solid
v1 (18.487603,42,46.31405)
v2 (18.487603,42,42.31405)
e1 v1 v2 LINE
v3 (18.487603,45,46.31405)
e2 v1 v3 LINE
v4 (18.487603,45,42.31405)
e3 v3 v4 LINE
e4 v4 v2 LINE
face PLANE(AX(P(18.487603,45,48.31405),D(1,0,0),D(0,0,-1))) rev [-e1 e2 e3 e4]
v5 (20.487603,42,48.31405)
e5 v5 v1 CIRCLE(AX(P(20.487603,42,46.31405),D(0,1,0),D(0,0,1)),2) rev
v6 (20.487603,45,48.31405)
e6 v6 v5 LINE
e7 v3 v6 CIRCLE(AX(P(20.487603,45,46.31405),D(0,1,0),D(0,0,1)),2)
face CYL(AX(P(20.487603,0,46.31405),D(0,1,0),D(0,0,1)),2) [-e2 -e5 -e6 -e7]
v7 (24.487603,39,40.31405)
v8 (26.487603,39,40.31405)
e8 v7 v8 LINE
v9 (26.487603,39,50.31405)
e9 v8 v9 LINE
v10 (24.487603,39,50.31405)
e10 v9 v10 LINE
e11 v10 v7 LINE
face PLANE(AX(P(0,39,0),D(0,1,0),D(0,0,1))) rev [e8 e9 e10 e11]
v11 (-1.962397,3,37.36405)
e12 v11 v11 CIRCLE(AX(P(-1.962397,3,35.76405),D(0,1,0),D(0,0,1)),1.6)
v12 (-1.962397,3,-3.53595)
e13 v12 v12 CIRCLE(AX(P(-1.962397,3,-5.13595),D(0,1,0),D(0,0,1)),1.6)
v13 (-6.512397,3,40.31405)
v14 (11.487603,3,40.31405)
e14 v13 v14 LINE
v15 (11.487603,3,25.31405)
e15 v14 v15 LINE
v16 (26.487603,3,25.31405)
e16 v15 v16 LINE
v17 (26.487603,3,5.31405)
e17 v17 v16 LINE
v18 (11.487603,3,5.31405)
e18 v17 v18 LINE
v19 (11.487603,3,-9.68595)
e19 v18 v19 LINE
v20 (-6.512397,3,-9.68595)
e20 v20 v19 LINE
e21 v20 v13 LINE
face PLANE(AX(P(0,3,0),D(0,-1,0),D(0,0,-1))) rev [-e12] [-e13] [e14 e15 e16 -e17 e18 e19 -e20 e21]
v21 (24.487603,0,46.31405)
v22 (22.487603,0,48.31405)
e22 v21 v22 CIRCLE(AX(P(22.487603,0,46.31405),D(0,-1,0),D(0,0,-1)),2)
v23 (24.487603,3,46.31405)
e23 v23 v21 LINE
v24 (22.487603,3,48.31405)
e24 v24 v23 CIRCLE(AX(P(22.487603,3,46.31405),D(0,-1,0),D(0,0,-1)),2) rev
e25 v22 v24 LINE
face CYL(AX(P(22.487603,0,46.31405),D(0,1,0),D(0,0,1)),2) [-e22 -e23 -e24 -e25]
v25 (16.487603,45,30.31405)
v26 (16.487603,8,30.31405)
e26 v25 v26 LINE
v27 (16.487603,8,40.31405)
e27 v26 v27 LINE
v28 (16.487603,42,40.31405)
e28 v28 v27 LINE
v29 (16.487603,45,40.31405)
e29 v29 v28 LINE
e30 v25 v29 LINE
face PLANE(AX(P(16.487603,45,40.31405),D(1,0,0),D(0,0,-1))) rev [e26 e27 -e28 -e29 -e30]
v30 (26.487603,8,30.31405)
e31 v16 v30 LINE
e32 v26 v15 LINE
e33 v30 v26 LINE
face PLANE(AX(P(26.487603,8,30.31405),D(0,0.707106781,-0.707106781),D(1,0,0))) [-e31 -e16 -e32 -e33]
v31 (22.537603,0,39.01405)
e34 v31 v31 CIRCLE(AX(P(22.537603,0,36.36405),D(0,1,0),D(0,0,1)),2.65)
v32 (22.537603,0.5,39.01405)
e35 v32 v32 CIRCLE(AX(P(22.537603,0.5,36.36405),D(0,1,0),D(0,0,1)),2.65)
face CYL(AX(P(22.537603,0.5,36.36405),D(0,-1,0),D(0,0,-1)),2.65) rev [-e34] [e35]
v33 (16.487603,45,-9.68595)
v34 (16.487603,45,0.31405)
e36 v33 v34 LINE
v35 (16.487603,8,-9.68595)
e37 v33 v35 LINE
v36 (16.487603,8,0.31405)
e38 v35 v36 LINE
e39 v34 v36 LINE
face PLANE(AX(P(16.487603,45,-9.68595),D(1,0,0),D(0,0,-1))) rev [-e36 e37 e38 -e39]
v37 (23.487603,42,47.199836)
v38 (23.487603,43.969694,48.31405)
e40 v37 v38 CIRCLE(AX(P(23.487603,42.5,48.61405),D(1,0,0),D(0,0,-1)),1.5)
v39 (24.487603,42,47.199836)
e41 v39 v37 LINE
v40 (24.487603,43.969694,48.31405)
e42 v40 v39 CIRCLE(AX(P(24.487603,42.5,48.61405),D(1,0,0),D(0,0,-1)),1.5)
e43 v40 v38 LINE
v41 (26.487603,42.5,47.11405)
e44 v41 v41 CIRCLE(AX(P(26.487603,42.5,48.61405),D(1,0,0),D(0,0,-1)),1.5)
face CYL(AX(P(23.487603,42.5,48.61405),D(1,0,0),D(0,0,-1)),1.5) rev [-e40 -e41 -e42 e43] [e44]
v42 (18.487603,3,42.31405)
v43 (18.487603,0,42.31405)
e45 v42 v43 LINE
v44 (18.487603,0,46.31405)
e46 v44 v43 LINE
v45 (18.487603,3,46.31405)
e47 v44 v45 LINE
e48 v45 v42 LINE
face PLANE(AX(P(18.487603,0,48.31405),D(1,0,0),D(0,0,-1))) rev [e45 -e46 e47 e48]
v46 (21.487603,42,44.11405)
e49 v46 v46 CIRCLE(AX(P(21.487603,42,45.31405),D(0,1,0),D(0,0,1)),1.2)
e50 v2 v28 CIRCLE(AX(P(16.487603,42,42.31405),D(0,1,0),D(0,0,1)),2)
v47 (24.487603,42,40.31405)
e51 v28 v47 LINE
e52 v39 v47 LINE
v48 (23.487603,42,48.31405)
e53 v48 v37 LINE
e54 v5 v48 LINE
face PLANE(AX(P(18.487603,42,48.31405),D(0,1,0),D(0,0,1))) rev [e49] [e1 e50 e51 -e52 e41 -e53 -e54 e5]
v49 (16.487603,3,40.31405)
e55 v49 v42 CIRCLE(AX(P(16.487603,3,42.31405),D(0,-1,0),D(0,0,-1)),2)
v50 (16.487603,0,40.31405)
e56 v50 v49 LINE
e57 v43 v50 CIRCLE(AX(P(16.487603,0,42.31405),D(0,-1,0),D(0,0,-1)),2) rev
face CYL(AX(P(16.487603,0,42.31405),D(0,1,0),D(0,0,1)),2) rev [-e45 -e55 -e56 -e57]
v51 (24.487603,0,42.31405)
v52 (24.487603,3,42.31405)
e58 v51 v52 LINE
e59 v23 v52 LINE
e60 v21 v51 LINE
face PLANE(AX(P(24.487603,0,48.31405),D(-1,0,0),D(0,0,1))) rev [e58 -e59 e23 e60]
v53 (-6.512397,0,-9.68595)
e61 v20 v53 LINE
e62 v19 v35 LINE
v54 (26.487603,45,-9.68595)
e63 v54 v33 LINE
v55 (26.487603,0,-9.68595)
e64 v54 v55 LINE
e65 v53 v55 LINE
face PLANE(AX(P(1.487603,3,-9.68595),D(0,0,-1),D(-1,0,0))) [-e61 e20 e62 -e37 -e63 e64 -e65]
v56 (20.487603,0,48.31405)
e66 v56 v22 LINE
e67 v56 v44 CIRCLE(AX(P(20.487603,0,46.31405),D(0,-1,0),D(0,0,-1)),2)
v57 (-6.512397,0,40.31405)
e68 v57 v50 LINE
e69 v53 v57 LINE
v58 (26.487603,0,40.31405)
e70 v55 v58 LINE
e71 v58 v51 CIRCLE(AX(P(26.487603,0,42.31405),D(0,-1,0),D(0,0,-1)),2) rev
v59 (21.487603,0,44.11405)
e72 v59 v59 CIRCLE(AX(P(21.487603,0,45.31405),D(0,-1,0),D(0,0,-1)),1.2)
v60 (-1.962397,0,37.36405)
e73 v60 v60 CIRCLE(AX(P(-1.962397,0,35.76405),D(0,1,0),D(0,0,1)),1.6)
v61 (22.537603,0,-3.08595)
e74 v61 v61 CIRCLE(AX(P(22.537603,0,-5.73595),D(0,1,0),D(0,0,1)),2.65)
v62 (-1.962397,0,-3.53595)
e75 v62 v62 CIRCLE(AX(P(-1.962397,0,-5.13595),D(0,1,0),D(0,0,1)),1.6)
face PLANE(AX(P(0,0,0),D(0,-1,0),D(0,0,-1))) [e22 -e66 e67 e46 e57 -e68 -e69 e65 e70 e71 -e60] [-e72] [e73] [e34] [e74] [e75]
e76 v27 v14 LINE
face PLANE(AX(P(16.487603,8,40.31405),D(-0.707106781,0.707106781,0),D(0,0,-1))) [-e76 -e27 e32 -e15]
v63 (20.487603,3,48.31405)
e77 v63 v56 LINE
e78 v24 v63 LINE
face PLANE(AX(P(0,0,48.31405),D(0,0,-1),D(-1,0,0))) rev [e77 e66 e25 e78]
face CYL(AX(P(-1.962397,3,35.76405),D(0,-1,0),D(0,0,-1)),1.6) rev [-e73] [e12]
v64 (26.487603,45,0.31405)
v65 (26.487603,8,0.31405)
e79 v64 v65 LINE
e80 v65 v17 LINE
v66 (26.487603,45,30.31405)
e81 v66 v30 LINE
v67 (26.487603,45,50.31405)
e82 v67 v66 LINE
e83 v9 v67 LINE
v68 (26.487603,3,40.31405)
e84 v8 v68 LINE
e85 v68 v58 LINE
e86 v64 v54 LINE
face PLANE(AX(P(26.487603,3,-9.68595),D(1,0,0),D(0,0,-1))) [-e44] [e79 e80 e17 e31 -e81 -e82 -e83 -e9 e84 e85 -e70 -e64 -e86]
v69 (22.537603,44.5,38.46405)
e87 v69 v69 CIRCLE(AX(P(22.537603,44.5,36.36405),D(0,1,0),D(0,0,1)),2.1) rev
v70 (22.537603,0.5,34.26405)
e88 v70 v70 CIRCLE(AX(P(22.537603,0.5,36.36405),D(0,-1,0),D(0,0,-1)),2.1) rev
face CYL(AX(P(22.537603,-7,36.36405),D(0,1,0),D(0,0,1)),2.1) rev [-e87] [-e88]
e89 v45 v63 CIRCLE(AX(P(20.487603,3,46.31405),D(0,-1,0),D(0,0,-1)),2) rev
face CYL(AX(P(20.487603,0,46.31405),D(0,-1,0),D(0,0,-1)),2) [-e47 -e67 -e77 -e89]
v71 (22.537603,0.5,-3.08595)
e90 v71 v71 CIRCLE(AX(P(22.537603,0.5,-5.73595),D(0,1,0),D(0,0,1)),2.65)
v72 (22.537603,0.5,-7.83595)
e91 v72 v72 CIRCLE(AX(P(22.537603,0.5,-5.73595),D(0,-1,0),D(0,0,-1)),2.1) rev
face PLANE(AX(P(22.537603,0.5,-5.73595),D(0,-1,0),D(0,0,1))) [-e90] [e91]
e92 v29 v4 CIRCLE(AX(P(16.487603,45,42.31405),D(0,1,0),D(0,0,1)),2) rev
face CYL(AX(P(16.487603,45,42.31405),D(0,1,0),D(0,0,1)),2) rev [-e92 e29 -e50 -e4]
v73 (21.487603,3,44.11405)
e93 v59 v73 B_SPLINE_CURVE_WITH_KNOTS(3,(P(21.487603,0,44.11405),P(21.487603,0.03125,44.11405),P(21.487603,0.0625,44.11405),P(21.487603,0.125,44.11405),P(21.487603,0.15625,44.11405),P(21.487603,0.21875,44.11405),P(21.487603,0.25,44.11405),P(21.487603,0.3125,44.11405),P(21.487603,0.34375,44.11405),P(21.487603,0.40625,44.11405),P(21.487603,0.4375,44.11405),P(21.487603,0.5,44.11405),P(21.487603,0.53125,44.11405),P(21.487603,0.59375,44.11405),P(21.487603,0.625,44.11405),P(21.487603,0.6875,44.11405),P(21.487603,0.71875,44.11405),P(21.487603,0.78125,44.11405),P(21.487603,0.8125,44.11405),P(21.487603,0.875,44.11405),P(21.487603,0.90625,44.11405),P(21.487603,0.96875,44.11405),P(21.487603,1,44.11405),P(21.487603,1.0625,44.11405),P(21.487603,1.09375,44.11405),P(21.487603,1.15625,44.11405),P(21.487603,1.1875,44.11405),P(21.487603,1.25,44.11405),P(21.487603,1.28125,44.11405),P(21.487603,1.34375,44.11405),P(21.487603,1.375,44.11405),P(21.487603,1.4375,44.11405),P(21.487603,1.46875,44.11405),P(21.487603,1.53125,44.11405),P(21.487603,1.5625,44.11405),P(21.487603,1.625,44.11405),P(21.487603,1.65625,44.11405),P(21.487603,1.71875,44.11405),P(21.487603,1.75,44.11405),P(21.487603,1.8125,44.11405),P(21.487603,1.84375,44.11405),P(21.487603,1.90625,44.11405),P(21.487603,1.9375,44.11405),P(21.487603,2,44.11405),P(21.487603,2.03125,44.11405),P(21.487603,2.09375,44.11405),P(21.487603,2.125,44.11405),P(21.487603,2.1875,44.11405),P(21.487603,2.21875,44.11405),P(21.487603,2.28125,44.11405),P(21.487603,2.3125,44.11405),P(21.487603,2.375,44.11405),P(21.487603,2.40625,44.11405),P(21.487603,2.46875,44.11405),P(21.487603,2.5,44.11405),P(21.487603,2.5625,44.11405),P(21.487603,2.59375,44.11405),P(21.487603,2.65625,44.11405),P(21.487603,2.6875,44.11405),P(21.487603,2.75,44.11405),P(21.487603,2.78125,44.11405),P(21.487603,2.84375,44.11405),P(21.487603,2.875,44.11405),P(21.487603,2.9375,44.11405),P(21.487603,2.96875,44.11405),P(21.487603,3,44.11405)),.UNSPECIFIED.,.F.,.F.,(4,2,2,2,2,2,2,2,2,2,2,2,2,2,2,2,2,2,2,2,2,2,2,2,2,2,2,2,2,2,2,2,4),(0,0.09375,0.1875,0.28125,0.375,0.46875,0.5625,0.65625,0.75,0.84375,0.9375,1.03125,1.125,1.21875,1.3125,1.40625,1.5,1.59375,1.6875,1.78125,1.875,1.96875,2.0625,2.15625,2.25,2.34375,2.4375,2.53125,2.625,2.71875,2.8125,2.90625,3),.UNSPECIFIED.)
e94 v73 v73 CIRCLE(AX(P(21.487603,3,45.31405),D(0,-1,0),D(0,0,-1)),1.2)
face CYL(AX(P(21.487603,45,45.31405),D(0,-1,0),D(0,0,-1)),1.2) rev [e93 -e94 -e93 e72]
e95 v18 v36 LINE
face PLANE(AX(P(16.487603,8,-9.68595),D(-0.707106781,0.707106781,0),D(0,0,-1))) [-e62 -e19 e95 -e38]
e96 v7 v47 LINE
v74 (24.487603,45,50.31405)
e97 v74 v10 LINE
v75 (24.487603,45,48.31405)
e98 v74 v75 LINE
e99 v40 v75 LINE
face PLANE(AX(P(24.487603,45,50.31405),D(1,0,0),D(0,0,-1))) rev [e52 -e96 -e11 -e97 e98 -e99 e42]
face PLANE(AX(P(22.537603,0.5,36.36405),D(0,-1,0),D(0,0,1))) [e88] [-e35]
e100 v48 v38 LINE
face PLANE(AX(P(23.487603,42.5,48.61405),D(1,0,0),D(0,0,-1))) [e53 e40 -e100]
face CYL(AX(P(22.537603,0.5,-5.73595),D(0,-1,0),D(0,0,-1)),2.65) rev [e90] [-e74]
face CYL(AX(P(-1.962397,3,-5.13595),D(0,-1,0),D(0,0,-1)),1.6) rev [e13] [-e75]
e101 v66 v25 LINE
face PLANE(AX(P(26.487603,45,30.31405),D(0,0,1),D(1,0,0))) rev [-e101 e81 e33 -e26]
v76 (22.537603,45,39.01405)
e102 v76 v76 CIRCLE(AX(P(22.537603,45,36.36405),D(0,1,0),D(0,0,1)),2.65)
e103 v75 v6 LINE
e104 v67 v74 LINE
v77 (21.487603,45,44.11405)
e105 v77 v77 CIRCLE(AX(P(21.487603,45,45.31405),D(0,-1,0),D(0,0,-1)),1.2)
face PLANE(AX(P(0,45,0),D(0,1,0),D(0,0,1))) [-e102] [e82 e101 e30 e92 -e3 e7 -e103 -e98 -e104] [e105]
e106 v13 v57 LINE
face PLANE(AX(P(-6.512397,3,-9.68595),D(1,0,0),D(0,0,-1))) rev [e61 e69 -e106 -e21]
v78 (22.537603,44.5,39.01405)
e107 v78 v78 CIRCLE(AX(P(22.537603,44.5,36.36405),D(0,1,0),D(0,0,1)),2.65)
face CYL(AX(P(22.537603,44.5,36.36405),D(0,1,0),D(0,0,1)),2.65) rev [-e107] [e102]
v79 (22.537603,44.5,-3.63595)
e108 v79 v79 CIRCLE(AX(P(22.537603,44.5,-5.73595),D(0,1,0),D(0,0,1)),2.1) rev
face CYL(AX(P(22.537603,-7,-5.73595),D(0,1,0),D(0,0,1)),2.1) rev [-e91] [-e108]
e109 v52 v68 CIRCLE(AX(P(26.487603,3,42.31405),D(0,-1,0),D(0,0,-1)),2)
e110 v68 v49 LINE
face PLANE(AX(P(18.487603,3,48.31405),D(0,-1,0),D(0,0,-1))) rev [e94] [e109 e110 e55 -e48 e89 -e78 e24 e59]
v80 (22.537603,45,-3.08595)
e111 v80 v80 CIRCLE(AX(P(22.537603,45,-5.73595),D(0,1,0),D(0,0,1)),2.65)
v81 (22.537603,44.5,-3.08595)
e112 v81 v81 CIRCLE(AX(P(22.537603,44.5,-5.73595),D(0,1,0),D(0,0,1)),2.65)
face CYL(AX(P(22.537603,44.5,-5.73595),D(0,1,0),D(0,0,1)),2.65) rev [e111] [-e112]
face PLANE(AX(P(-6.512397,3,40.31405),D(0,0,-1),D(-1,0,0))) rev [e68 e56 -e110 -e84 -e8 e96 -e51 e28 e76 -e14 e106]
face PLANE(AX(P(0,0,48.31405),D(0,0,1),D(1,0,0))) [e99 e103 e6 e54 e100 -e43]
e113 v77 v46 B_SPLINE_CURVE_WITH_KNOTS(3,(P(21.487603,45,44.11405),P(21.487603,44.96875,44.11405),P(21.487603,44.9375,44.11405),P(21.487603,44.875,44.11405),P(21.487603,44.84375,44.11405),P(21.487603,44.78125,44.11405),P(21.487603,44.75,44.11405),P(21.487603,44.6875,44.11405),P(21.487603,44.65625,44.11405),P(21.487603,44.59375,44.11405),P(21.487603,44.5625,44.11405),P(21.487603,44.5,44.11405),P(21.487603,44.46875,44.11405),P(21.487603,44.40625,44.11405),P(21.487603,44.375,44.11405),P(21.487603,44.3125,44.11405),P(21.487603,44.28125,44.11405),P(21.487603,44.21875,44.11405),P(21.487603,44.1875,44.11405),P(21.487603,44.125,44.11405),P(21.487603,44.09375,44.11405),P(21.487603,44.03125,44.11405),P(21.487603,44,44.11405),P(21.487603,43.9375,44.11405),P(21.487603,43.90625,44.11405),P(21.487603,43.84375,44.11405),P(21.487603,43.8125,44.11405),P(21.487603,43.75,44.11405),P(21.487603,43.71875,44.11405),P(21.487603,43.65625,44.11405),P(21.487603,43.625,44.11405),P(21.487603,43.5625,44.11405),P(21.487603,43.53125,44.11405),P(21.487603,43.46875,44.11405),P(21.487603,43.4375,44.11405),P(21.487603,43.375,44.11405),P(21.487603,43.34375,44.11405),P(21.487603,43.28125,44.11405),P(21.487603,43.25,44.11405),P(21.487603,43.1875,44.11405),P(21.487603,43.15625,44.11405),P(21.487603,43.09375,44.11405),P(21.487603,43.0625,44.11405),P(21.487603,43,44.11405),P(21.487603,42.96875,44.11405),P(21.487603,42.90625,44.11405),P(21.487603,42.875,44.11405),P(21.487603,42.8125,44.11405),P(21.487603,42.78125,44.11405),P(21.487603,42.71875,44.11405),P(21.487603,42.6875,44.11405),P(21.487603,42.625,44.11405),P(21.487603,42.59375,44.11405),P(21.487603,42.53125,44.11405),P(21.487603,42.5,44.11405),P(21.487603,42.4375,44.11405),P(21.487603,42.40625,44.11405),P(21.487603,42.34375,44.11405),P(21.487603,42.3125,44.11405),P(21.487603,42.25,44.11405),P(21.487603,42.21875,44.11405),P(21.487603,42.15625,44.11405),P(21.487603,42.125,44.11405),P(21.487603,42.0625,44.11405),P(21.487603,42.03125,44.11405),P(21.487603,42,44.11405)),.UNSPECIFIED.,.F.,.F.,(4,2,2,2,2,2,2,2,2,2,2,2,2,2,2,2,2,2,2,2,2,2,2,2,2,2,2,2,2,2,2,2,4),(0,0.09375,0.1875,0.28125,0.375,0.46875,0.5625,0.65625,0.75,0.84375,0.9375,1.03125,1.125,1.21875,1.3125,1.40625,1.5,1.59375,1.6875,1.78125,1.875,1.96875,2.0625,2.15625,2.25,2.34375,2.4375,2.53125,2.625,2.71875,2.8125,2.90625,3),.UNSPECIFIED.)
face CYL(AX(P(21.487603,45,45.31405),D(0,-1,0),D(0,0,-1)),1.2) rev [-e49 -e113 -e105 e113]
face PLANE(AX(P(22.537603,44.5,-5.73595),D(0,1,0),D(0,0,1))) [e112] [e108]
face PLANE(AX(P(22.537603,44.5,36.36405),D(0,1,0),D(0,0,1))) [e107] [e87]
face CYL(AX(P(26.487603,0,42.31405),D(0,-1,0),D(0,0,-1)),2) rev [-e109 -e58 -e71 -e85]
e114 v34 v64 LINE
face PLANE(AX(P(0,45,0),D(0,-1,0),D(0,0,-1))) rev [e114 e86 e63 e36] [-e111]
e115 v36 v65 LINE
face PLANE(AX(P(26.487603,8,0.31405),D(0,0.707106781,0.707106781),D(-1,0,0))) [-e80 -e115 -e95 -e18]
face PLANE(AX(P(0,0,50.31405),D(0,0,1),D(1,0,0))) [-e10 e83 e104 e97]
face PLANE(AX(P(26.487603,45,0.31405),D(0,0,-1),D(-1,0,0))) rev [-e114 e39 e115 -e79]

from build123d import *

# Parameters (mm, degrees)
SKETCH1_R           = 1.6
BOSS_EXTRUDE1_DEPTH = 3
SKETCH2_W           = 10
SKETCH2_H           = 10
BOSS_EXTRUDE2_DEPTH = 42
CHAMFER1_SIZE       = 5
SKETCH3_R           = 2.1
CUT_EXTRUDE1_DEPTH  = 52
SKETCH4_R           = 2.65
CUT_EXTRUDE2_DEPTH  = 0.5
SKETCH11_W          = 6
SKETCH11_H          = 3
BOSS_EXTRUDE7_DEPTH = 8
SKETCH12_R          = 1.2
CUT_EXTRUDE5_DEPTH  = 72.139584736
FILLET1_R           = 2
SKETCH13_W          = 2
SKETCH13_H          = 3
BOSS_EXTRUDE8_DEPTH = 10
SKETCH14_W          = 2
SKETCH14_H          = 10
BOSS_EXTRUDE9_DEPTH = 3
SKETCH15_R          = 1.5
CUT_EXTRUDE6_DEPTH  = 3


with BuildPart() as part:
    # Sketch1 → Boss-Extrude1 (new body)
    with BuildSketch(Plane(origin=(0, 0, 0), x_dir=(1, 0, 0), z_dir=(0, 1, 0))):
        Polygon((-6.512396694, 9.685950413), (1.487603306, 9.685950413), (26.487603306, 9.685950413), (26.487603306, -40.314049587), (1.487603306, -40.314049587), (-6.512396694, -40.314049587), align=None)
        with Locations(Location((-1.962396694, -35.764049587, 0), (0, 0, 270))):
            Circle(SKETCH1_R, mode=Mode.SUBTRACT)
        with Locations(Location((-1.962396694, 5.135950413, 0), (0, 0, 270))):
            Circle(SKETCH1_R, mode=Mode.SUBTRACT)
    extrude(amount=BOSS_EXTRUDE1_DEPTH)

    # Sketch2 → Boss-Extrude2 (add)
    with BuildSketch(Plane(origin=(0, 3, 0), x_dir=(1, 0, 0), z_dir=(0, 1, 0))):
        with Locations((21.487603306, -35.314049587)):
            Rectangle(SKETCH2_W, SKETCH2_H)
        with Locations((21.487603306, 4.685950413)):
            Rectangle(SKETCH2_W, SKETCH2_H)
    extrude(amount=BOSS_EXTRUDE2_DEPTH)

    # Chamfer1
    chamfer1_edges = [part.edges().sort_by_distance(p)[0] for p in [
        (21.487603306, 3, 30.314049587),
        (16.487603306, 3, 35.314049587),
        (16.487603306, 3, -4.685950413),
        (21.487603306, 3, 0.314049587),
    ]]
    chamfer(chamfer1_edges, length=CHAMFER1_SIZE)

    # Sketch3 → Cut-Extrude1 (cut)
    with BuildSketch(Plane(origin=(0, 45, 0), x_dir=(1, 0, 0), z_dir=(0, 1, 0))):
        with Locations(Location((22.537603306, -36.364049587, 0), (0, 0, 270))):
            Circle(SKETCH3_R)
        with Locations(Location((22.537603306, 5.735950413, 0), (0, 0, 270))):
            Circle(SKETCH3_R)
    extrude(amount=-CUT_EXTRUDE1_DEPTH, mode=Mode.SUBTRACT)

    # Sketch4 → Cut-Extrude2 (cut)
    with BuildSketch(Plane(origin=(0, 45, 0), x_dir=(1, 0, 0), z_dir=(0, 1, 0))):
        with Locations(Location((22.537603306, -36.364049587, 0), (0, 0, 270))):
            Circle(SKETCH4_R)
        with Locations(Location((22.537603306, 5.735950413, 0), (0, 0, 270))):
            Circle(SKETCH4_R)
    cut_extrude2 = extrude(amount=-CUT_EXTRUDE2_DEPTH, mode=Mode.SUBTRACT)

    # Mirror1: Cut-Extrude2 across plane
    add(cut_extrude2.mirror(Plane(origin=(0, 22.5, 0), x_dir=(0, 0, 1), z_dir=(0, -1, 0))), mode=Mode.SUBTRACT)

    # Sketch11 → Boss-Extrude7 (add)
    with BuildSketch(Plane.XY.offset(40.314049587)):
        with Locations((21.487603306, 43.5)):
            Rectangle(SKETCH11_W, SKETCH11_H)
        with Locations((21.487603306, 1.5)):
            Rectangle(SKETCH11_W, SKETCH11_H)
    extrude(amount=BOSS_EXTRUDE7_DEPTH)

    # Sketch12 → Cut-Extrude5 (cut, through all)
    with BuildSketch(Plane.XZ):
        with Locations(Location((21.487603306, 45.314049587, 0), (0, 0, 270))):
            Circle(SKETCH12_R)
    extrude(amount=-CUT_EXTRUDE5_DEPTH, mode=Mode.SUBTRACT)

    # Fillet1
    fillet1_edges = [part.edges().sort_by_distance(p)[0] for p in [
        (18.487603306, 43.5, 40.314049587),
        (18.487603306, 1.5, 40.314049587),
        (24.487603306, 1.5, 40.314049587),
    ]]
    fillet(fillet1_edges, radius=FILLET1_R - 0.0001)  # a hair under: the kernel refuses the full size
    fillet1_2_edges = [part.edges().sort_by_distance(p)[0] for p in [
        (18.487603306, 43.5, 48.314049587),
        (24.487603306, 1.5, 48.314049587),
        (18.487603306, 1.5, 48.314049587),
    ]]
    fillet(fillet1_2_edges, radius=FILLET1_R)

    # Sketch13 → Boss-Extrude8 (add)
    with BuildSketch(Plane.XY.offset(40.314049587)):
        with Locations((25.487603306, 43.5)):
            Rectangle(SKETCH13_W, SKETCH13_H)
    extrude(amount=BOSS_EXTRUDE8_DEPTH)

    # Sketch14 → Boss-Extrude9 (add)
    with BuildSketch(Plane.XZ.offset(-42)):
        with Locations((25.487603306, 45.314049587)):
            Rectangle(SKETCH14_W, SKETCH14_H)
    extrude(amount=BOSS_EXTRUDE9_DEPTH)

    # Sketch15 → Cut-Extrude6 (cut)
    with BuildSketch(Plane(origin=(26.487603306, 0, 0), x_dir=(0, 0, -1), z_dir=(1, 0, 0))):
        with Locations((-48.614049587, 42.5)):
            Circle(SKETCH15_R)
    extrude(amount=-CUT_EXTRUDE6_DEPTH, mode=Mode.SUBTRACT)


solid = part.part
